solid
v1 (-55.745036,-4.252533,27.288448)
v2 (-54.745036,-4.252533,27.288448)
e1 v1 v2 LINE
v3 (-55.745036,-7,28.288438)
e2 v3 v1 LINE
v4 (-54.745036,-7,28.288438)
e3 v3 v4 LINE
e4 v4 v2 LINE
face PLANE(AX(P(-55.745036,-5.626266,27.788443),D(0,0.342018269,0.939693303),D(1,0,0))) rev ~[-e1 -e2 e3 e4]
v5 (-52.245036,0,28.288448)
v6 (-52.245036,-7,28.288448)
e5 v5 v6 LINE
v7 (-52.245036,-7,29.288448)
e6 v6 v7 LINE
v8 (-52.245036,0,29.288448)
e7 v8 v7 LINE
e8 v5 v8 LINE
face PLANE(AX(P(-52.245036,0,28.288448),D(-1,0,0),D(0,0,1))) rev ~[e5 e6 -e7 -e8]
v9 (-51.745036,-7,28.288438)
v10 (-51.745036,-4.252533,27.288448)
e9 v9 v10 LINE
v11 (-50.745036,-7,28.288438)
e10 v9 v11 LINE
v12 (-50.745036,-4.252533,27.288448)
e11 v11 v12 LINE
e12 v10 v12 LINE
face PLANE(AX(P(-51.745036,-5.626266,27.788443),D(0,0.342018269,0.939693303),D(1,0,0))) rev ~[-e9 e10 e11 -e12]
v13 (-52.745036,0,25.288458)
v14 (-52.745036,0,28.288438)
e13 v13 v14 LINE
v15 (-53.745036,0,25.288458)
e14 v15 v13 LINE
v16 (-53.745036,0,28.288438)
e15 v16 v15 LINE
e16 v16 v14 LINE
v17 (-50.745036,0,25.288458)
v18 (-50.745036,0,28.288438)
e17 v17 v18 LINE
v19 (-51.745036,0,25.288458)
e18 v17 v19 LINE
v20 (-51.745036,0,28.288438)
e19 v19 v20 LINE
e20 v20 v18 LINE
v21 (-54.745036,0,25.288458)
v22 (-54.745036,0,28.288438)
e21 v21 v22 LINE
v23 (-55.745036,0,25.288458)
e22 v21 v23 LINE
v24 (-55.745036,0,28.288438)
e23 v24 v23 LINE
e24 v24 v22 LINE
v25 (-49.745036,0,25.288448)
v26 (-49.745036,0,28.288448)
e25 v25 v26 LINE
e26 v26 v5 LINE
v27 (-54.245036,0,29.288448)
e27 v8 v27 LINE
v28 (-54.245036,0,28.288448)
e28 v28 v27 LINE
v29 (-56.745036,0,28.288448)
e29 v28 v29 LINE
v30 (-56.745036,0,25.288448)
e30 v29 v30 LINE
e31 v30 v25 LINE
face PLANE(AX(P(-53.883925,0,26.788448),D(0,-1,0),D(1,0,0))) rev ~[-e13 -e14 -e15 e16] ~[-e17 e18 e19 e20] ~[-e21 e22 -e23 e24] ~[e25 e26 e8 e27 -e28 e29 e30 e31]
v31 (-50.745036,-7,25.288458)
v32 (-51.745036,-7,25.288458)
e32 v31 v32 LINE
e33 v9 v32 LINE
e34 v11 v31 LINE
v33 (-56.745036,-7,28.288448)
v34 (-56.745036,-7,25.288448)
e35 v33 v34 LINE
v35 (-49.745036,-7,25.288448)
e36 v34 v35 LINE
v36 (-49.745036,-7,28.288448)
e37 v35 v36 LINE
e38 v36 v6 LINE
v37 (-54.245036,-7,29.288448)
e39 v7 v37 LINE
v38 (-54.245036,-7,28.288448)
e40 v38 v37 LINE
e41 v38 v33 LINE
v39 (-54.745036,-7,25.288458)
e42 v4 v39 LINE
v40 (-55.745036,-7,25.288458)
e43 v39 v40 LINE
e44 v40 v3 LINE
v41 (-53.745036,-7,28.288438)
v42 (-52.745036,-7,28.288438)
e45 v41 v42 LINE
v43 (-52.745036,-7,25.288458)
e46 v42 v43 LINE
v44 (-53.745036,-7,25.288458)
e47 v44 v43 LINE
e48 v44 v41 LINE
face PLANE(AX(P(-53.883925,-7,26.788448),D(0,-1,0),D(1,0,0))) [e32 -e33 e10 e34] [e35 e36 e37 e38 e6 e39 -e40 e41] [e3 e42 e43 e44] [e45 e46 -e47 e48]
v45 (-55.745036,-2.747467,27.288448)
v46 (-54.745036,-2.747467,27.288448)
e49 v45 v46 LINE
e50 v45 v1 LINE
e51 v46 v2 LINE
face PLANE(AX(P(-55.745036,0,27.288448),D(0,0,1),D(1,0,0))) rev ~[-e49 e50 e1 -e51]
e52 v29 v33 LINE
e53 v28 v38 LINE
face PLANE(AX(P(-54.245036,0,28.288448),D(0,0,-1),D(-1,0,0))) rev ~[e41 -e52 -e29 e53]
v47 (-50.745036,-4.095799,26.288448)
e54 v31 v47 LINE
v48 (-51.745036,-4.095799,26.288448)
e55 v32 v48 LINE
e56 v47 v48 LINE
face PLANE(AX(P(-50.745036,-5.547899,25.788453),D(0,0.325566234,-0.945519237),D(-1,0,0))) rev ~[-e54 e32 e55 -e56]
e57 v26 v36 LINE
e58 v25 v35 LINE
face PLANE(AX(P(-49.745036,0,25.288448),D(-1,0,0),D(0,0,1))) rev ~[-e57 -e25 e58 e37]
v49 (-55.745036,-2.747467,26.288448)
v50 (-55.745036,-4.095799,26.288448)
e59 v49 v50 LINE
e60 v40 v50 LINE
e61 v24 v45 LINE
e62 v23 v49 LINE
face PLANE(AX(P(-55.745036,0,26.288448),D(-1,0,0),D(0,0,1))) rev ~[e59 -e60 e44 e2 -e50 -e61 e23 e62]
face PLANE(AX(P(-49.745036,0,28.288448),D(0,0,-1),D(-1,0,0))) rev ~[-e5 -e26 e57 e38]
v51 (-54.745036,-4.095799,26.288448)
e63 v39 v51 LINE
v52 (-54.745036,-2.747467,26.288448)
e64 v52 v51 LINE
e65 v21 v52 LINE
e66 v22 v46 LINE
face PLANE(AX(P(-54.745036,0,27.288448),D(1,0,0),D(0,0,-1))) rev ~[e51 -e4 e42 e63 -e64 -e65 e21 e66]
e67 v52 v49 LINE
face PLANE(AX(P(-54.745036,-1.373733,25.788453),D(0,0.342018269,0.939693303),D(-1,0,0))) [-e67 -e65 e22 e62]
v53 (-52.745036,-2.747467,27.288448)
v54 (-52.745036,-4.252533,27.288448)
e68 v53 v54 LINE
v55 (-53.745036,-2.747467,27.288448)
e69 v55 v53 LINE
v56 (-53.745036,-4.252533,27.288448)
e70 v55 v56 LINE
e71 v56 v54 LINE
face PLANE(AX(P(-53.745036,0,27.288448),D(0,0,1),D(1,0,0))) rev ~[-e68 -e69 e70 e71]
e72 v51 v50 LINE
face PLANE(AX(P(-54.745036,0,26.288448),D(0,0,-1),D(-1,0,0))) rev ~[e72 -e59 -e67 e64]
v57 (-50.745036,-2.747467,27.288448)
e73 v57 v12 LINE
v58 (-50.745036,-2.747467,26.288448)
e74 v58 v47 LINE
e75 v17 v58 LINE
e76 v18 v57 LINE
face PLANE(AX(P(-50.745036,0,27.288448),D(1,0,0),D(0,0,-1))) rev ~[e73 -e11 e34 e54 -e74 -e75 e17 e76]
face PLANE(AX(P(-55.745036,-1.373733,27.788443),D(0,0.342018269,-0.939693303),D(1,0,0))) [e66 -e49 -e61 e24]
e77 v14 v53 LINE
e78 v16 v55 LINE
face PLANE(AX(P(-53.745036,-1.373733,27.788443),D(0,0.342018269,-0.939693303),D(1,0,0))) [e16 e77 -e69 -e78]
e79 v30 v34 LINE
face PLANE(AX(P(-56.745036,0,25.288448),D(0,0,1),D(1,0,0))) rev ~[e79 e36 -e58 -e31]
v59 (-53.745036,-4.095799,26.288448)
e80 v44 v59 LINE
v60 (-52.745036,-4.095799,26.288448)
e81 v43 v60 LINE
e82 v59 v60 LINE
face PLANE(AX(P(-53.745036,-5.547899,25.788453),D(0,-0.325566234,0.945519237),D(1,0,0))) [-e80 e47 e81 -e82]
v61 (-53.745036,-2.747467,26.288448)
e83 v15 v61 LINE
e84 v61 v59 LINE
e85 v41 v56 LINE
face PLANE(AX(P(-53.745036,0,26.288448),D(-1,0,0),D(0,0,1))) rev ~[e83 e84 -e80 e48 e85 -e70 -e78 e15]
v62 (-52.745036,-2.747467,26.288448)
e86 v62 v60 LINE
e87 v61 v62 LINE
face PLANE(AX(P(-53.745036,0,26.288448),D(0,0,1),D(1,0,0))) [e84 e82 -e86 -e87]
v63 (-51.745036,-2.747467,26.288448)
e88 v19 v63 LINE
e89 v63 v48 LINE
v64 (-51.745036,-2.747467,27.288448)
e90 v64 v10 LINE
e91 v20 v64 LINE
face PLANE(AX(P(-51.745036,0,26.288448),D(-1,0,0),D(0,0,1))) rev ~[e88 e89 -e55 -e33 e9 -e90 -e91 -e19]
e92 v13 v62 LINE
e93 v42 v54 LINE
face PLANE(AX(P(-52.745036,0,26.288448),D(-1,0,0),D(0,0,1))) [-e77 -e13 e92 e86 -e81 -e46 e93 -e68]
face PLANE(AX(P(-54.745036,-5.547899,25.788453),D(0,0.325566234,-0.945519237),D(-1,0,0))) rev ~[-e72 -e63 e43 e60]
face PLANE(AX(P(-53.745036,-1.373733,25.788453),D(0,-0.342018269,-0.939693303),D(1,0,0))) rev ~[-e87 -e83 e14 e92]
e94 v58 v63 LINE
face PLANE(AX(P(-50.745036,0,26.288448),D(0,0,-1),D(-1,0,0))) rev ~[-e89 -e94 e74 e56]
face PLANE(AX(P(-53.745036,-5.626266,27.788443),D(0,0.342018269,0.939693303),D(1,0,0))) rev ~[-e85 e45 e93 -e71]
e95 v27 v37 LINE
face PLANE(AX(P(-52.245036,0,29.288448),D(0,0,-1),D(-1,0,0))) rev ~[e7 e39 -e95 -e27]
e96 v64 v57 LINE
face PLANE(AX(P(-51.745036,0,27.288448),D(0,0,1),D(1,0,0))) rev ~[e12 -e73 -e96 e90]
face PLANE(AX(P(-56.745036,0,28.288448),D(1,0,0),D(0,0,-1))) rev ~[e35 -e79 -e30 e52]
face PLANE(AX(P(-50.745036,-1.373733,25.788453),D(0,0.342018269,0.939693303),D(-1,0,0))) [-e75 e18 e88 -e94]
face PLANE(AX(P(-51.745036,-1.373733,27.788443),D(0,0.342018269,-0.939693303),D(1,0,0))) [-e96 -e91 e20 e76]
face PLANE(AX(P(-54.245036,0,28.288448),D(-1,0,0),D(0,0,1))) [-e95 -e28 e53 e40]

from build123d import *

# Parameters (mm, degrees)
F0_W       = 1
F0_H       = 1
F1_DEPTH   = 7
F2_SIZE2   = 2.747467
F2_SIZE    = 0.99999
F2_2_SIZE2 = 2.747467
F2_2_SIZE  = 0.99999
F3_SIZE2   = 2.904201
F3_SIZE    = 0.99999


# Not quite as in the source:
# - a fillet or chamfer is up to 0.001 mm smaller than in the source, because OpenCascade refuses the exact size


with BuildPart() as f1:
    # F0 (on Front) → F1 (new body)
    with BuildSketch(Plane.XZ):
        Polygon((-56.745035848, 28.2884484402), (-56.745035848, 26.7884484402), (-56.745035848, 25.2884484402), (-51.245035848, 25.2884484402), (-51.245035848, 26.2884484402), (-51.745035848, 26.2884484402), (-51.745035848, 27.2884484402), (-51.245035848, 27.2884484402), (-51.245035848, 28.2884484402), (-52.245035848, 28.2884484402), (-53.245035848, 28.2884484402), (-54.245035848, 28.2884484402), align=None)
        Polygon((-54.745035848, 26.2884484402), (-55.745035848, 26.2884484402), (-55.745035848, 26.7884484402), (-55.745035848, 27.2884484402), (-54.745035848, 27.2884484402), align=None, mode=Mode.SUBTRACT)
        with Locations((-53.245035848, 26.7884484402)):
            Rectangle(F0_W, F0_H, mode=Mode.SUBTRACT)
        Polygon((-50.745035848, 26.7884484402), (-49.745035848, 26.7884484402), (-49.745035848, 28.2884484402), (-51.245035848, 28.2884484402), (-51.245035848, 27.2884484402), (-50.745035848, 27.2884484402), align=None)
        Polygon((-51.245035848, 26.2884484402), (-51.245035848, 25.2884484402), (-49.745035848, 25.2884484402), (-49.745035848, 26.7884484402), (-50.745035848, 26.7884484402), (-50.745035848, 26.2884484402), align=None)
        with Locations((-52.745035848, 28.7884484402)):
            Rectangle(F0_W, F0_H)
        with Locations((-53.745035848, 28.7884484402)):
            Rectangle(F0_W, F0_H)
    extrude(amount=F1_DEPTH)

    # F2 (size 1 and 2.7474774195 in the source; OpenCascade refuses exactly that, so slightly less here)
    f2_edges = [f1.edges().sort_by_distance(p)[0] for p in [
        (-51.245036, 0, 26.288448),
        (-51.245036, 0, 27.288448),
        (-53.245036, 0, 27.288448),
        (-53.245036, 0, 26.288448),
        (-55.245036, 0, 27.288448),
        (-55.245036, 0, 26.288448),
    ]]
    f2_side = f1.faces().sort_by_distance((-56.664413, 0, 26.788448))[0]
    chamfer(f2_edges, length=F2_SIZE, length2=F2_SIZE2, reference=f2_side)

    # F2#2 (size 1 and 2.7474774195 in the source; OpenCascade refuses exactly that, so slightly less here)
    f2_2_edges = [f1.edges().sort_by_distance(p)[0] for p in [
        (-55.245036, -7, 27.288448),
        (-53.245036, -7, 27.288448),
        (-51.245036, -7, 27.288448),
    ]]
    f2_2_side = f1.faces().sort_by_distance((-56.664413, -7, 26.788448))[0]
    chamfer(f2_2_edges, length=F2_2_SIZE, length2=F2_2_SIZE2, reference=f2_2_side)

    # F3 (size 1 and 2.9042108777 in the source; OpenCascade refuses exactly that, so slightly less here)
    f3_edges = [f1.edges().sort_by_distance(p)[0] for p in [
        (-55.245036, -7, 26.288448),
        (-53.245036, -7, 26.288448),
        (-51.245036, -7, 26.288448),
    ]]
    f3_side = f1.faces().sort_by_distance((-55.825658, -7, 27.788443))[0]
    chamfer(f3_edges, length=F3_SIZE, length2=F3_SIZE2, reference=f3_side)


solid = f1.part
